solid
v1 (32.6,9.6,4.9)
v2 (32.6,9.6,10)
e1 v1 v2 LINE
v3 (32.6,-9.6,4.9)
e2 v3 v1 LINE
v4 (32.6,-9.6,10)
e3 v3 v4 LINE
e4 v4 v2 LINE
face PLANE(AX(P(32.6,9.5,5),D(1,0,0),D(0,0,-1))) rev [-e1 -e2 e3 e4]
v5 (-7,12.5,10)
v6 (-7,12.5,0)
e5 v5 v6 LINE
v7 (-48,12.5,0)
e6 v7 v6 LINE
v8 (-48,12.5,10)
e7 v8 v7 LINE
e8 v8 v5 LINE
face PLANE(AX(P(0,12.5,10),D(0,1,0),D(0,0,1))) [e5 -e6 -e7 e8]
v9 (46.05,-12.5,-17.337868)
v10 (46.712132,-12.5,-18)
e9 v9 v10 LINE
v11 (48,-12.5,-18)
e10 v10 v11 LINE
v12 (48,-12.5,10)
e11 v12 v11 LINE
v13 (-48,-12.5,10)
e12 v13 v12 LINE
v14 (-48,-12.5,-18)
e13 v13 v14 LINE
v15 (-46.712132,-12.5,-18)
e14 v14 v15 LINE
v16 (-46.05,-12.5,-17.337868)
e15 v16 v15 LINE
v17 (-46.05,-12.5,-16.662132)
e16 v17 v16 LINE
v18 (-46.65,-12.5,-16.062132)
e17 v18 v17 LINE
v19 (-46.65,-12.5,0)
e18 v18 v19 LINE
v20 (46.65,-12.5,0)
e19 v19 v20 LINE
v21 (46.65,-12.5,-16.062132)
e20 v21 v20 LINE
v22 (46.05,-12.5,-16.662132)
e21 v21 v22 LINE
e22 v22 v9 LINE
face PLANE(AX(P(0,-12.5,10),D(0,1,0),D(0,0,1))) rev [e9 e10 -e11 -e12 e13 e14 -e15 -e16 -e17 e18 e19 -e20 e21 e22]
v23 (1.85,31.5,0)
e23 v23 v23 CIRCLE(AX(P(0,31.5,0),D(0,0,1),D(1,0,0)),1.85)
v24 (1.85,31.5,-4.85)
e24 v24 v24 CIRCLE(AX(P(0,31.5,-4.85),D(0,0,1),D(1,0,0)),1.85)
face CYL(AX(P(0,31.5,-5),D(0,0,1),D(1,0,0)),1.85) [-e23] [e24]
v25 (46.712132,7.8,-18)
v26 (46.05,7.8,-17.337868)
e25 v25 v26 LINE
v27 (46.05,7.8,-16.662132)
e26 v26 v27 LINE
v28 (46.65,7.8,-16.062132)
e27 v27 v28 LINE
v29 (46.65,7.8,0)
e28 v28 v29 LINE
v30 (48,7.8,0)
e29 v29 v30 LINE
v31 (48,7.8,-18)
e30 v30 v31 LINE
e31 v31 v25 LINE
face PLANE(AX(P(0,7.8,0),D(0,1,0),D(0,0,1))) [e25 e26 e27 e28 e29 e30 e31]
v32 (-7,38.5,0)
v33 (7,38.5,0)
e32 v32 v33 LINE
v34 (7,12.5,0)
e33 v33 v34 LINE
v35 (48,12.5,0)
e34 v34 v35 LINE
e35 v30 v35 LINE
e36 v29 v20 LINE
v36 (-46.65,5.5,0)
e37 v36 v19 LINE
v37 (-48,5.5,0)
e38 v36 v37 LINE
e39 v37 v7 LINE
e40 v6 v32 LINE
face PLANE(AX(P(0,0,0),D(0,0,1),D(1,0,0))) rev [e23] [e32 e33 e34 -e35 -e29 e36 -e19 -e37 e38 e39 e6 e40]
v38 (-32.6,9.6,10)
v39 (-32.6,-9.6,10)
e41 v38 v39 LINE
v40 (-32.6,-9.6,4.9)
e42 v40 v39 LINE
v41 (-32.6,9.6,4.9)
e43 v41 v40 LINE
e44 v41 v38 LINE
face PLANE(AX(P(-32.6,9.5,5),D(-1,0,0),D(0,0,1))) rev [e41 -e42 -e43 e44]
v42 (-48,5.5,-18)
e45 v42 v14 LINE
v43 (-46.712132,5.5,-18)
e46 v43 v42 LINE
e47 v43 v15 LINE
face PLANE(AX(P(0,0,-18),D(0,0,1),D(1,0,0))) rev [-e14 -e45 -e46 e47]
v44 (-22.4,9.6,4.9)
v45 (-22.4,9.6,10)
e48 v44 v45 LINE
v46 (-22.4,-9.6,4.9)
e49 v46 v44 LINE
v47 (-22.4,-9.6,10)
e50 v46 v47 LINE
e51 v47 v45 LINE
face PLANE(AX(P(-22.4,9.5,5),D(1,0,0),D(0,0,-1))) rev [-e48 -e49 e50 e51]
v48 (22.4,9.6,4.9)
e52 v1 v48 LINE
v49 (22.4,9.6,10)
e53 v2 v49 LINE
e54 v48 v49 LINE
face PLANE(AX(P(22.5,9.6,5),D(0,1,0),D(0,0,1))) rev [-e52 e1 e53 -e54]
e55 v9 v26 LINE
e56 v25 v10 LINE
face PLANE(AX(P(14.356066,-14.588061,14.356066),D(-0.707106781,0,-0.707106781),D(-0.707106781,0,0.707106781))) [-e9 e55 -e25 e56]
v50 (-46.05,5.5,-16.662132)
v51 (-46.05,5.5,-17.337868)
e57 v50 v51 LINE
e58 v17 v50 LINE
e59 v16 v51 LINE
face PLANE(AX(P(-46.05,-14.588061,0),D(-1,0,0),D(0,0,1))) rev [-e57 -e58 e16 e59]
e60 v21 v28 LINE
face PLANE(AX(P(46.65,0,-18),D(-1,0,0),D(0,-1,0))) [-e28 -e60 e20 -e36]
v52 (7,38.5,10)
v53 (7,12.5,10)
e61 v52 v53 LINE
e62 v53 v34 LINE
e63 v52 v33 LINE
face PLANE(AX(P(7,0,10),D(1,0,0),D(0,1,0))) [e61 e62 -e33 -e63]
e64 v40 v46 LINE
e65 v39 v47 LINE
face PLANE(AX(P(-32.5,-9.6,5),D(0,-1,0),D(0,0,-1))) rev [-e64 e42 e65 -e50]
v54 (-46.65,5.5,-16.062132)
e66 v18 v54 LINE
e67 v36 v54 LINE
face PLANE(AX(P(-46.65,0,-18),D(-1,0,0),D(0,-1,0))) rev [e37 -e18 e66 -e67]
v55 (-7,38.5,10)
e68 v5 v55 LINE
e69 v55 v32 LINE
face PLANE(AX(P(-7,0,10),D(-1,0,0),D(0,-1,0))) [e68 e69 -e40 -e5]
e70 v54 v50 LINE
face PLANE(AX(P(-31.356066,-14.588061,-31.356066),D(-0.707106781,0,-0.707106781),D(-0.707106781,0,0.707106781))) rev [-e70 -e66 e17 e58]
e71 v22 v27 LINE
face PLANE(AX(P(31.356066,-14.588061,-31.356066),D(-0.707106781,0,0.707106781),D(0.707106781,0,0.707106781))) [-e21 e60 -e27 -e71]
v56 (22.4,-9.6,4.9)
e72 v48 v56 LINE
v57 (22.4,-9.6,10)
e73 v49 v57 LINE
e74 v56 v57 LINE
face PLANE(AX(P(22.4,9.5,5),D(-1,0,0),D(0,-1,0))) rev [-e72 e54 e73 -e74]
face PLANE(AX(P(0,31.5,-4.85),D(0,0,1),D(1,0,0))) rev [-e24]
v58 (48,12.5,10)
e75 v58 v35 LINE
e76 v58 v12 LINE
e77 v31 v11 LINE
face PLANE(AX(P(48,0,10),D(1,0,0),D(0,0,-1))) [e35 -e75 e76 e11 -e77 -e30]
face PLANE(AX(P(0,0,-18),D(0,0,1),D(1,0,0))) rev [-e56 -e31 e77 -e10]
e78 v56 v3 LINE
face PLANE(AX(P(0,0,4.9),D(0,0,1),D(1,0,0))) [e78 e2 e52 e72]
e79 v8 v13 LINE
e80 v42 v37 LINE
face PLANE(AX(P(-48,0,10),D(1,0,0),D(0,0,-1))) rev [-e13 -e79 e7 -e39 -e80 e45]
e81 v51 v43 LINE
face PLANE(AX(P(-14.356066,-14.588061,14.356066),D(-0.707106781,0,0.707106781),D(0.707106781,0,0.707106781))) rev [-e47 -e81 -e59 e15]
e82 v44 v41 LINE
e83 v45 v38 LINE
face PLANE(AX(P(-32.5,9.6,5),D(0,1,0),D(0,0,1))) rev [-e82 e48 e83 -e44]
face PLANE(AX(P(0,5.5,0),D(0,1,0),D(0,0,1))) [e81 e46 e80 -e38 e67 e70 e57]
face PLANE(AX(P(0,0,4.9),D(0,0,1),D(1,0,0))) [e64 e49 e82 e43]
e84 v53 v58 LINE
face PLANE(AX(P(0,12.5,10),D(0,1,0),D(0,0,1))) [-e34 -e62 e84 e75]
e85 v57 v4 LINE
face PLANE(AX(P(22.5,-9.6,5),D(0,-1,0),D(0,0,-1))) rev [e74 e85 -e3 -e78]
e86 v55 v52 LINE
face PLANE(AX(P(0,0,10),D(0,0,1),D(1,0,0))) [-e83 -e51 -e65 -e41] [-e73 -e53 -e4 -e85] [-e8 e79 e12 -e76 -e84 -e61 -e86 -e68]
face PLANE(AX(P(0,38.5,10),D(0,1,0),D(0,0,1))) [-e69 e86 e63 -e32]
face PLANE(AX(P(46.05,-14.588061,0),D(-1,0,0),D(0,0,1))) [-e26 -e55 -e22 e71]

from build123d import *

# Parameters (mm, degrees)
SKETCH1_W                = 1.5
SKETCH1_H                = 25
SKETCH1_W_2              = 14
SKETCH1_H_2              = 26
SKETCH1_R                = 2
BOSS_EXTRUDE1_DEPTH      = 10
SKETCH1_3_W              = 1.5
SKETCH1_3_H              = 25
BOSS_EXTRUDE2_DEPTH      = 18
SKETCH1_4_R              = 2
BOSS_EXTRUDE3_DEPTH      = 5
BOSS_EXTRUDE4_DEPTH      = 25
CUT_EXTRUDE1_DEPTH       = 4.7
CUT_EXTRUDE2_DEPTH       = 7
SKETCH8_W                = 10
SKETCH8_H                = 19
CUT_EXTRUDE3_DEPTH       = 5
MOVE_START               = -12.5
MOVE_FACE1_DEPTH         = 20.3
MOVE_START_2             = -5
MOVE_FACE1_2_OUTLINE_R   = 2
MOVE_FACE1_2_OUTLINE_R_2 = 1.85
MOVE_FACE1_2_DEPTH       = 5
MOVE_FACE1_3_OUTLINE_R   = 1.85
MOVE_FACE1_3_DEPTH       = 0.15
MOVE_FACE2_BY            = 0.1
MOVE_FACE2_2_BY          = 0.1
MOVE_FACE2_3_BY          = 0.1
MOVE_FACE2_4_BY          = 0.1
MOVE_FACE2_5_BY          = 0.1
MOVE_FACE2_6_BY          = 0.1
MOVE_FACE2_7_BY          = 0.1
MOVE_FACE2_8_BY          = 0.1
MOVE_FACE2_9_BY          = 0.1
MOVE_FACE2_10_BY         = 0.1


# Read off the part's stored shape, not the designer's step: Move Face1
with BuildPart() as part:
    # Sketch1 → Boss-Extrude1 (new body)
    # profile 1 of 5: a face of its own
    with BuildSketch(Plane.XY):
        Polygon((-7, 12.5), (-46.5, 12.5), (-46.5, -12.5), (46.5, -12.5), (46.5, 12.5), (7, 12.5), align=None)
    # profile 2 of 5: a face of its own
    with BuildSketch(Plane.XY):
        with Locations((-47.25, 0)):
            Rectangle(SKETCH1_W, SKETCH1_H)
    # profile 3 of 5: a face of its own
    with BuildSketch(Plane.XY):
        with Locations((47.25, 0)):
            Rectangle(SKETCH1_W, SKETCH1_H)
    # profile 4 of 5: a face of its own
    with BuildSketch(Plane.XY):
        with Locations((0, 25.5)):
            Rectangle(SKETCH1_W_2, SKETCH1_H_2)
        with Locations((0, 31.5)):
            Circle(SKETCH1_R, mode=Mode.SUBTRACT)
    # profile 5 of 5: a face of its own
    with BuildSketch(Plane.XY):
        with Locations((0, 31.5)):
            Circle(SKETCH1_R)
    extrude(amount=BOSS_EXTRUDE1_DEPTH)

    # Sketch1<3> → Boss-Extrude2 (add)
    with BuildSketch(Plane.XY):
        with Locations((47.25, 0)):
            Rectangle(SKETCH1_3_W, SKETCH1_3_H)
        with Locations((-47.25, 0)):
            Rectangle(SKETCH1_3_W, SKETCH1_3_H)
    extrude(amount=-BOSS_EXTRUDE2_DEPTH)

    # Sketch1<4> → Boss-Extrude3 (add)
    with BuildSketch(Plane.XY):
        with Locations((0, 31.5)):
            Circle(SKETCH1_4_R)
    extrude(amount=-BOSS_EXTRUDE3_DEPTH)

    # Sketch5 → Boss-Extrude4 (add)
    with BuildSketch(Plane(origin=(0, 12.5, 0), x_dir=(1, 0, 0), z_dir=(0, 1, 0))):
        Polygon((45.9, 17.4), (45.9, 16.6), (46.5, 16), (46.5, 18), align=None)
        Polygon((-45.9, 17.4), (-46.5, 18), (-46.5, 16), (-45.9, 16.6), align=None)
    extrude(amount=-BOSS_EXTRUDE4_DEPTH)

    # Sketch7 → Cut-Extrude1 (cut)
    with BuildSketch(Plane(origin=(0, 12.5, 0), x_dir=(1, 0, 0), z_dir=(0, 1, 0))):
        Polygon((46.5, 16), (46.5, 0), (48, 0), (48, 18), (46.5, 18), (45.9, 17.4), (45.9, 16.6), align=None)
    extrude(amount=-CUT_EXTRUDE1_DEPTH, mode=Mode.SUBTRACT)

    # Sketch7<4> → Cut-Extrude2 (cut)
    with BuildSketch(Plane(origin=(0, 12.5, 0), x_dir=(1, 0, 0), z_dir=(0, 1, 0))):
        Polygon((-48, 0), (-46.5, 0), (-46.5, 16), (-45.9, 16.6), (-45.9, 17.4), (-46.5, 18), (-48, 18), align=None)
    extrude(amount=-CUT_EXTRUDE2_DEPTH, mode=Mode.SUBTRACT)

    # Sketch8 → Cut-Extrude3 (cut)
    with BuildSketch(Plane.XY.offset(10)):
        with Locations((-27.5, 0)):
            Rectangle(SKETCH8_W, SKETCH8_H)
        with Locations((27.5, 0)):
            Rectangle(SKETCH8_W, SKETCH8_H)
    extrude(amount=-CUT_EXTRUDE3_DEPTH, mode=Mode.SUBTRACT)

    # Move Face1 outline → Move Face1 (cut)
    with BuildSketch(Plane(origin=(0, 0, 0), x_dir=(1, 0, 0), z_dir=(0, 1, 0)).offset(MOVE_START)):
        Polygon((-46.05, 16.662132034), (-46.65, 16.062132034), (-46.65, 0), (-46.5, 0), (-46.5, 16), (-45.9, 16.6), (-45.9, 17.4), (-46.5, 18), (-46.712132034, 18), (-46.05, 17.337867966), align=None)
        Polygon((46.5, 16), (46.5, 0), (46.65, 0), (46.65, 16.062132034), (46.05, 16.662132034), (46.05, 17.337867966), (46.712132034, 18), (46.5, 18), (45.9, 17.4), (45.9, 16.6), align=None)
    extrude(amount=MOVE_FACE1_DEPTH, mode=Mode.SUBTRACT)

    # Move Face1 2 outline → Move Face1 2 (cut)
    with BuildSketch(Plane.XY.offset(MOVE_START_2)):
        with Locations((0, 31.5)):
            Circle(MOVE_FACE1_2_OUTLINE_R)
        with Locations((0, 31.5)):
            Circle(MOVE_FACE1_2_OUTLINE_R_2, mode=Mode.SUBTRACT)
    extrude(amount=MOVE_FACE1_2_DEPTH, mode=Mode.SUBTRACT)

    # Move Face1 3 outline → Move Face1 3 (cut)
    with BuildSketch(Plane.XY.offset(MOVE_START_2)):
        with Locations((0, 31.5)):
            Circle(MOVE_FACE1_3_OUTLINE_R)
    extrude(amount=MOVE_FACE1_3_DEPTH, mode=Mode.SUBTRACT)

    # Move Face2: a face moved inward by 0.1
    extrude(part.faces().sort_by_distance((-22.5, 0, 7.5))[0], amount=MOVE_FACE2_BY, dir=(1, 0, 0), mode=Mode.SUBTRACT)

    # Move Face2 2: a face moved inward by 0.1
    extrude(part.faces().sort_by_distance((-32.5, 0, 7.5))[0], amount=MOVE_FACE2_2_BY, dir=(-1, 0, 0), mode=Mode.SUBTRACT)

    # Move Face2 3: a face moved inward by 0.1
    extrude(part.faces().sort_by_distance((27.5, -9.5, 7.5))[0], amount=MOVE_FACE2_3_BY, dir=(0, -1, 0), mode=Mode.SUBTRACT)

    # Move Face2 4: a face moved inward by 0.1
    extrude(part.faces().sort_by_distance((22.5, 0, 7.5))[0], amount=MOVE_FACE2_4_BY, dir=(-1, 0, 0), mode=Mode.SUBTRACT)

    # Move Face2 5: a face moved inward by 0.1
    extrude(part.faces().sort_by_distance((32.5, 0, 7.5))[0], amount=MOVE_FACE2_5_BY, dir=(1, 0, 0), mode=Mode.SUBTRACT)

    # Move Face2 6: a face moved inward by 0.1
    extrude(part.faces().sort_by_distance((27.5, 9.5, 7.5))[0], amount=MOVE_FACE2_6_BY, dir=(0, 1, 0), mode=Mode.SUBTRACT)

    # Move Face2 7: a face moved inward by 0.1
    extrude(part.faces().sort_by_distance((27.5, 0, 5))[0], amount=MOVE_FACE2_7_BY, dir=(0, 0, -1), mode=Mode.SUBTRACT)

    # Move Face2 8: a face moved inward by 0.1
    extrude(part.faces().sort_by_distance((-27.5, -9.5, 7.5))[0], amount=MOVE_FACE2_8_BY, dir=(0, -1, 0), mode=Mode.SUBTRACT)

    # Move Face2 9: a face moved inward by 0.1
    extrude(part.faces().sort_by_distance((-27.5, 9.5, 7.5))[0], amount=MOVE_FACE2_9_BY, dir=(0, 1, 0), mode=Mode.SUBTRACT)

    # Move Face2 10: a face moved inward by 0.1
    extrude(part.faces().sort_by_distance((-27.5, 0, 5))[0], amount=MOVE_FACE2_10_BY, dir=(0, 0, -1), mode=Mode.SUBTRACT)


solid = part.part
